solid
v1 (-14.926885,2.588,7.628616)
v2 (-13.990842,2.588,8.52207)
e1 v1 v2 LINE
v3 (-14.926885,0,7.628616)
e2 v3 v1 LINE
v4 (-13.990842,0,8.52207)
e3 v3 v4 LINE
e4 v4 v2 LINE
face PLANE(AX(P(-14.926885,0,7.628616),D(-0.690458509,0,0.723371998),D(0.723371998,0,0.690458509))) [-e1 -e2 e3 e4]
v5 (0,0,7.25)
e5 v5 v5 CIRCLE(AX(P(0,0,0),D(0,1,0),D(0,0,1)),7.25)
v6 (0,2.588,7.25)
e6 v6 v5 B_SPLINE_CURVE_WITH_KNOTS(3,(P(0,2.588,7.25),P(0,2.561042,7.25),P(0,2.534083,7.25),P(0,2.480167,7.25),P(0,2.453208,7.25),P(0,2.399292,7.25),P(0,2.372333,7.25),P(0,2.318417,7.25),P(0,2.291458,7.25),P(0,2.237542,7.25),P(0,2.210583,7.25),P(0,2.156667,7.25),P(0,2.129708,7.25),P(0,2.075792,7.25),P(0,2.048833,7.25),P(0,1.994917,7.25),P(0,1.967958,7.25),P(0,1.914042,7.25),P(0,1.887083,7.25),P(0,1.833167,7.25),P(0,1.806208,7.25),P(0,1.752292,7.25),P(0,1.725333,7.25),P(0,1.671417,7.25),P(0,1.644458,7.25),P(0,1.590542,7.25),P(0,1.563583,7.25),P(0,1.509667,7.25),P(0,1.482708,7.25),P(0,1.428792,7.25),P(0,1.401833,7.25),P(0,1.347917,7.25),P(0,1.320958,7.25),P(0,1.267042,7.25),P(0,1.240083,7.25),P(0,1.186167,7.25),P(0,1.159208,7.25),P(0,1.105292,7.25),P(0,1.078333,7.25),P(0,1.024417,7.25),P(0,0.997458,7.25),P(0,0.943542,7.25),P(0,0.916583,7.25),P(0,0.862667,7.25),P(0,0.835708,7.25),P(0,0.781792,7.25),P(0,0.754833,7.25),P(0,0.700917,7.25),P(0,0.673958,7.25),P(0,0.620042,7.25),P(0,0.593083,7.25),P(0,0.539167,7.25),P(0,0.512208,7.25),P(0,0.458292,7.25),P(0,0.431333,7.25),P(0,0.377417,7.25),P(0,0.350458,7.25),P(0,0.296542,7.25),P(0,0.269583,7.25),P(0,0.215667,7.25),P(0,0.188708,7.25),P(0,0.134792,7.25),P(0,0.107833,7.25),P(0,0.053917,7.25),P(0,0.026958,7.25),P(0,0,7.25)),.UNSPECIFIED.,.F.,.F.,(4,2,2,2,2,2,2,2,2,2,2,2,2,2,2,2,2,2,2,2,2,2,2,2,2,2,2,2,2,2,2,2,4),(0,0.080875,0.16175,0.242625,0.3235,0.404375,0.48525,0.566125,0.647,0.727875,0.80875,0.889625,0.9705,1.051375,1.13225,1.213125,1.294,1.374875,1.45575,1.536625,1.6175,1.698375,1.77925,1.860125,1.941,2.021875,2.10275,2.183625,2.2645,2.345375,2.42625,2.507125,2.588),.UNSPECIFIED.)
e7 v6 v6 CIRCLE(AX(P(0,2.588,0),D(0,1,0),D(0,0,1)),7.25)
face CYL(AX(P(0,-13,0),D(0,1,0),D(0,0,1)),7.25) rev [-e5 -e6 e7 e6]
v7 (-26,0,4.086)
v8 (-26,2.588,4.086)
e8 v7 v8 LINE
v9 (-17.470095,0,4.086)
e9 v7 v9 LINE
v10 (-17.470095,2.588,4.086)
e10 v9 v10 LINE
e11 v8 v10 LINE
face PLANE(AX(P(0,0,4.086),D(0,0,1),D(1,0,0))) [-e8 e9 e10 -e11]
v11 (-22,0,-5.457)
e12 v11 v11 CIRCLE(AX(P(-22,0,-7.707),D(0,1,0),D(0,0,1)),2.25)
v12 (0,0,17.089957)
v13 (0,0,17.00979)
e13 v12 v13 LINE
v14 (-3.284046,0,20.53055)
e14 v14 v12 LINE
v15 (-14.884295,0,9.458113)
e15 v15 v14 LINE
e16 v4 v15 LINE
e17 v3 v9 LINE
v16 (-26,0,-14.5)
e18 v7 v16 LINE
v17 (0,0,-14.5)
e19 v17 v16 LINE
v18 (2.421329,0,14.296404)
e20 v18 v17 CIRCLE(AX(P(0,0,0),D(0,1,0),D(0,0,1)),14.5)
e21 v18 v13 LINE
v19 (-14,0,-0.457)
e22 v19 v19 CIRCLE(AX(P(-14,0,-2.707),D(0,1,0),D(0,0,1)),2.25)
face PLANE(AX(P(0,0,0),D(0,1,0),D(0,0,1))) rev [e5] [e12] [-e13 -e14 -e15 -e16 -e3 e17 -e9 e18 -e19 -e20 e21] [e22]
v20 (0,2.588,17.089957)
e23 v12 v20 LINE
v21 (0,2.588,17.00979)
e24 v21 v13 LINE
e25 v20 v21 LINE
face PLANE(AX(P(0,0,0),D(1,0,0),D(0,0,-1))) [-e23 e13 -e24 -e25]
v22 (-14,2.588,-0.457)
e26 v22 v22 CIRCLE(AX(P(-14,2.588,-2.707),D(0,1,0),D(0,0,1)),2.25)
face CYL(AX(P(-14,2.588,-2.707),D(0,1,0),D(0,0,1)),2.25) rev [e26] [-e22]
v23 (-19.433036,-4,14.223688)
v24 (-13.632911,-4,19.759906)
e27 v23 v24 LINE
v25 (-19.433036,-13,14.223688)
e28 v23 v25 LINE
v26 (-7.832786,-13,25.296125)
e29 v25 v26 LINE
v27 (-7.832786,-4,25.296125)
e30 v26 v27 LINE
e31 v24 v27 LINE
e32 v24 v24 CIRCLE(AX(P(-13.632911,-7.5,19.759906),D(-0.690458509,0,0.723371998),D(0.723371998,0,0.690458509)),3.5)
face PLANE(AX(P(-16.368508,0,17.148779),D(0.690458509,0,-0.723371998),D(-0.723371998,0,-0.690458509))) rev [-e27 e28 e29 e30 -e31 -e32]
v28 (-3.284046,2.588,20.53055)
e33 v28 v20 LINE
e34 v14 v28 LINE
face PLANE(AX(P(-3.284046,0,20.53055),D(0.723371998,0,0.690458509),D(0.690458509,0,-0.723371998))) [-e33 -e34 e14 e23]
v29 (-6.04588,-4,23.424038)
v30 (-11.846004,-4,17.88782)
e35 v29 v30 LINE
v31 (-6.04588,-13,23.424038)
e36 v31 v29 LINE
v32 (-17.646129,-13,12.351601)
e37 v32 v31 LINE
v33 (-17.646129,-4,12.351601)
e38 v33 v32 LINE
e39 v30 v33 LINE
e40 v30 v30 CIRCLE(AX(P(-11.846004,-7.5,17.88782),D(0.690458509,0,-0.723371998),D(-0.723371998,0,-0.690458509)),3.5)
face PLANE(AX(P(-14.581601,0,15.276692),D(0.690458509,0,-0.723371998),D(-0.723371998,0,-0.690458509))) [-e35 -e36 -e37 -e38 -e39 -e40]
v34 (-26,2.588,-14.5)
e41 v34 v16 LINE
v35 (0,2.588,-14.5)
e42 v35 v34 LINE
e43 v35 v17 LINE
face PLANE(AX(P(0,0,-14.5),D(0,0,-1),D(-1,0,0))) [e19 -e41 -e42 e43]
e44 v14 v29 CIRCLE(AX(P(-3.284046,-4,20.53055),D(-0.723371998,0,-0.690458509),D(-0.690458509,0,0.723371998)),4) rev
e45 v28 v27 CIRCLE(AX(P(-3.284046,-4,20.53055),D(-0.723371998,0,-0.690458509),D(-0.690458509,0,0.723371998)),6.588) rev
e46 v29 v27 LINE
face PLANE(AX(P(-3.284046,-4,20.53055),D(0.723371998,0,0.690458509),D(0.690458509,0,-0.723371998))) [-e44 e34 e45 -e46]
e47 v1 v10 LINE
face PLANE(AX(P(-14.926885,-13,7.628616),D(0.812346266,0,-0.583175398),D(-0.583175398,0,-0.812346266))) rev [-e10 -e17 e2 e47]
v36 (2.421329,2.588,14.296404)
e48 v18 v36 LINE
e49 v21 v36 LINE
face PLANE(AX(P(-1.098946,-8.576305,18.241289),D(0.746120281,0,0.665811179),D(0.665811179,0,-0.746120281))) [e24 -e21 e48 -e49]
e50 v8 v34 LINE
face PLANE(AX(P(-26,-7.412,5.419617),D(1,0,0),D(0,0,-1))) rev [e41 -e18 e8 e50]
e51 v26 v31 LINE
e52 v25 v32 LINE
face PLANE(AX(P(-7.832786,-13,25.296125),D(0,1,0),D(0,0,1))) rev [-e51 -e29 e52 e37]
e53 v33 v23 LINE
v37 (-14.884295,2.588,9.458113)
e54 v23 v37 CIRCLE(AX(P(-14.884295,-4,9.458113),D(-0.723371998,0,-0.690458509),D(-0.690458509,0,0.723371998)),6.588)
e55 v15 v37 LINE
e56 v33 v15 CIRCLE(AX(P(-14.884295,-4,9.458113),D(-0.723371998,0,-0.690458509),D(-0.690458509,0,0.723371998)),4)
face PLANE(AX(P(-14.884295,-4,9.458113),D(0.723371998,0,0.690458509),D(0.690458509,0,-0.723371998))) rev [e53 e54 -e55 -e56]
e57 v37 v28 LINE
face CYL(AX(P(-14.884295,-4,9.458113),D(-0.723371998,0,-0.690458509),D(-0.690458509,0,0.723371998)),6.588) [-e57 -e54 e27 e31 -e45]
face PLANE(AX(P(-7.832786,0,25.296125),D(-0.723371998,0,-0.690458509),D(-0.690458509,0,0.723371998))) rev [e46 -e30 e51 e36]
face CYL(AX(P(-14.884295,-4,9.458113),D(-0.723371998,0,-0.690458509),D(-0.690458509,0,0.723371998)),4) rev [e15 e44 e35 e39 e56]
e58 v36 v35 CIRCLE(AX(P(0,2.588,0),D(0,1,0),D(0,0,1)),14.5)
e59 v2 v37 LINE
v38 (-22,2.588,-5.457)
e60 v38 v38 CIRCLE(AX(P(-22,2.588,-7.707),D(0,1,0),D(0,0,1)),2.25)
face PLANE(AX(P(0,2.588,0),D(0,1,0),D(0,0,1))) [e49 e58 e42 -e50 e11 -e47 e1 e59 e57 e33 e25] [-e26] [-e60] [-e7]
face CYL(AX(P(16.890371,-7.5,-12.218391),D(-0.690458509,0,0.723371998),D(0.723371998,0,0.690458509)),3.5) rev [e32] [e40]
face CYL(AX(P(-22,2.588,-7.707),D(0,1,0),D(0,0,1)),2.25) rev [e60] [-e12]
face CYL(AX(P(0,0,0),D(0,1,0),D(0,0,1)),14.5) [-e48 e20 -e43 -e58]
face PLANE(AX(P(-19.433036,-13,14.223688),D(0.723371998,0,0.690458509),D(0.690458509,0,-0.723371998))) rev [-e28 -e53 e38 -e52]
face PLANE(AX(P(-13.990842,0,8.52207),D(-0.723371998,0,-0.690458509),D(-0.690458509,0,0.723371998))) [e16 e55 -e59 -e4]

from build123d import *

# Parameters (mm, degrees)
BOSS_EXTRUDE1_DEPTH           = 3.175
CONVERT_SOLID1_START          = 2.588
CONVERT_SOLID1_DEPTH          = 0.587
EDGE_FLANGE1_STRIP_W          = 18.352
EDGE_FLANGE1_STRIP_H          = 2.588
EDGE_FLANGE1_STRIP_CUT_DEPTH  = 16.036353891
EDGE_FLANGE1_RELIEF_W         = 19.646
EDGE_FLANGE1_RELIEF_H         = 1.294
EDGE_FLANGE1_RELIEF_CUT_DEPTH = 2.588
EDGE_FLANGE1_DEPTH            = 16.036353891
SKETCH9_R                     = 3.5
CUT_EXTRUDE1_DEPTH            = 47.081558227
CUT_EXTRUDE2_DEPTH            = 41.148221328
M4_CLEARANCE_HOLE1_D          = 4.5
BOSS_EXTRUDE2_DEPTH           = 2.588
SKETCH19_R                    = 7.25
CUT_EXTRUDE3_DEPTH            = 41.148221328
SKETCH20_W                    = 2
SKETCH20_H                    = 21.253234492
CUT_EXTRUDE4_DEPTH            = 10


# Read off the part's stored shape, not the designer's step: Convert-Solid1
# Sheet-metal steps are written as plain solids
with BuildPart() as part:
    # Sketch1 → Boss-Extrude1 (new body)
    with BuildSketch(Plane(origin=(0, 0, 0), x_dir=(1, 0, 0), z_dir=(0, 1, 0))):
        with BuildLine():
            Line((0, 14.5), (-27, 14.5))
            Line((-27, 14.5), (-27, -4.086))
            Line((-27, -4.086), (-19.43303559, -4.086))
            Line((-19.43303559, -4.086), (-19.43303559, -14.223687844))
            Line((-19.43303559, -14.223687844), (-7.832786234, -25.296124838))
            Line((-7.832786234, -25.296124838), (0, -25.296124838))
            Line((0, -25.296124838), (0, -14.5))
            ThreePointArc((0, -14.5), (14.5, 0), (0, 14.5))
        make_face()
    extrude(amount=BOSS_EXTRUDE1_DEPTH)

    # Convert-Solid1 outline → Convert-Solid1 (cut)
    with BuildSketch(Plane(origin=(0, 0, 0), x_dir=(1, 0, 0), z_dir=(0, 1, 0)).offset(CONVERT_SOLID1_START)):
        with BuildLine():
            Line((0, 14.5), (-27, 14.5))
            Line((-27, 14.5), (-27, -4.086))
            Line((-27, -4.086), (-19.43303559, -4.086))
            Line((-19.43303559, -4.086), (-19.43303559, -14.223687844))
            Line((-19.43303559, -14.223687844), (-7.832786234, -25.296124838))
            Line((-7.832786234, -25.296124838), (0, -25.296124838))
            Line((0, -25.296124838), (0, -14.5))
            ThreePointArc((0, -14.5), (14.5, 0), (0, 14.5))
        make_face()
    extrude(amount=CONVERT_SOLID1_DEPTH, mode=Mode.SUBTRACT)

    # Edge-Flange1 strip (across the edge) → Edge-Flange1 strip cut (cut)
    with BuildSketch(Plane(origin=(-7.832786234, 0, 25.296124838), x_dir=(0.6904585088002791, -3.4914813388431334e-15, -0.7233719980931629), z_dir=(-0.7233719980931629, 0, -0.6904585088002791))):
        with Locations((-2.588, -1.294)):
            Rectangle(EDGE_FLANGE1_STRIP_W, EDGE_FLANGE1_STRIP_H)
    extrude(amount=EDGE_FLANGE1_STRIP_CUT_DEPTH, mode=Mode.SUBTRACT)

    # Edge-Flange1 relief (on the sheet) → Edge-Flange1 relief cut (cut)
    with BuildSketch(Plane(origin=(-3.284045578, 0, 20.530550115), x_dir=(0.6904585088002791, -6.982962677686267e-15, -0.7233719980931629), z_dir=(0, -1, 0))):
        with Locations((-8.529, 0.647)):
            Rectangle(EDGE_FLANGE1_RELIEF_W, EDGE_FLANGE1_RELIEF_H)
        with Locations((-8.529, -16.683353891)):
            Rectangle(EDGE_FLANGE1_RELIEF_W, EDGE_FLANGE1_RELIEF_H)
    extrude(amount=-EDGE_FLANGE1_RELIEF_CUT_DEPTH, mode=Mode.SUBTRACT)

    # Edge-Flange1 section (across the edge) → Edge-Flange1 (add)
    with BuildSketch(Plane(origin=(-7.832786234, 0, 25.296124838), x_dir=(0.6904585088002791, -3.4914813388431334e-15, -0.7233719980931629), z_dir=(-0.7233719980931629, 0, -0.6904585088002791))):
        with BuildLine():
            Line((0, 4), (0, 13))
            Line((0, 13), (2.588, 13))
            Line((2.588, 13), (2.588, 4))
            ThreePointArc((2.588, 4), (3.759572875, 1.171572875), (6.588, 0))
            Line((6.588, 0), (6.588, -2.588))
            ThreePointArc((6.588, -2.588), (1.929580526, -0.658419474), (0, 4))
        make_face()
    extrude(amount=EDGE_FLANGE1_DEPTH)

    # Sketch9 → Cut-Extrude1 (cut, through all)
    with BuildSketch(Plane(origin=(-16.368508108, 0, 17.148779057), x_dir=(0.7233719980931632, 3.1973878914611357e-15, 0.6904585088002789), z_dir=(-0.6904585088002789, 3.4046985453530564e-15, 0.7233719980931632))):
        with Locations(Location((3.78172946, -7.5, 0), (0, 0, 90))):
            Circle(SKETCH9_R)
    extrude(amount=-CUT_EXTRUDE1_DEPTH, mode=Mode.SUBTRACT)

    # Sketch10 → Cut-Extrude2 (cut, through all)
    with BuildSketch(Plane(origin=(0, 2.588, 0), x_dir=(1, 0, 0), z_dir=(0, 1, 0))):
        Polygon((-19.43303559, -4.086), (-17.470094505, -4.086), (-14.926884989, -7.628616445), (-19.43303559, -12.349570886), align=None)
        Polygon((0, -25.296124838), (-7.832786234, -25.296124838), (0, -17.08995726), align=None)
    extrude(amount=-CUT_EXTRUDE2_DEPTH, mode=Mode.SUBTRACT)

    # M4 Clearance Hole1 (through all)
    with Locations(Plane(origin=(0, 2.588, 0), x_dir=(1, 0, 0), z_dir=(0, 1, 0))):
        with Locations((-22, 7.707), (-14, 2.707)):
            Hole(M4_CLEARANCE_HOLE1_D / 2)

    # Sketch17 → Boss-Extrude2 (add)
    with BuildSketch(Plane(origin=(0, 2.588, 0), x_dir=(1, 0, 0), z_dir=(0, 1, 0))):
        Polygon((-1.098945785, -18.241288728), (4.611253989, -11.842333594), (-0.672962036, -12.348247452), align=None)
    extrude(amount=-BOSS_EXTRUDE2_DEPTH)

    # Sketch19 → Cut-Extrude3 (cut, through all)
    with BuildSketch(Plane(origin=(0, 2.588, 0), x_dir=(1, 0, 0), z_dir=(0, 1, 0))):
        with Locations(Location((0, 0, 0), (0, 0, 270))):
            Circle(SKETCH19_R)
    extrude(amount=-CUT_EXTRUDE3_DEPTH, mode=Mode.SUBTRACT)

    # Sketch20 → Cut-Extrude4 (cut)
    with BuildSketch(Plane(origin=(0, 2.588, 0), x_dir=(1, 0, 0), z_dir=(0, 1, 0))):
        with Locations((-27, 5.207)):
            Rectangle(SKETCH20_W, SKETCH20_H)
    extrude(amount=-CUT_EXTRUDE4_DEPTH, mode=Mode.SUBTRACT)


solid = part.part
